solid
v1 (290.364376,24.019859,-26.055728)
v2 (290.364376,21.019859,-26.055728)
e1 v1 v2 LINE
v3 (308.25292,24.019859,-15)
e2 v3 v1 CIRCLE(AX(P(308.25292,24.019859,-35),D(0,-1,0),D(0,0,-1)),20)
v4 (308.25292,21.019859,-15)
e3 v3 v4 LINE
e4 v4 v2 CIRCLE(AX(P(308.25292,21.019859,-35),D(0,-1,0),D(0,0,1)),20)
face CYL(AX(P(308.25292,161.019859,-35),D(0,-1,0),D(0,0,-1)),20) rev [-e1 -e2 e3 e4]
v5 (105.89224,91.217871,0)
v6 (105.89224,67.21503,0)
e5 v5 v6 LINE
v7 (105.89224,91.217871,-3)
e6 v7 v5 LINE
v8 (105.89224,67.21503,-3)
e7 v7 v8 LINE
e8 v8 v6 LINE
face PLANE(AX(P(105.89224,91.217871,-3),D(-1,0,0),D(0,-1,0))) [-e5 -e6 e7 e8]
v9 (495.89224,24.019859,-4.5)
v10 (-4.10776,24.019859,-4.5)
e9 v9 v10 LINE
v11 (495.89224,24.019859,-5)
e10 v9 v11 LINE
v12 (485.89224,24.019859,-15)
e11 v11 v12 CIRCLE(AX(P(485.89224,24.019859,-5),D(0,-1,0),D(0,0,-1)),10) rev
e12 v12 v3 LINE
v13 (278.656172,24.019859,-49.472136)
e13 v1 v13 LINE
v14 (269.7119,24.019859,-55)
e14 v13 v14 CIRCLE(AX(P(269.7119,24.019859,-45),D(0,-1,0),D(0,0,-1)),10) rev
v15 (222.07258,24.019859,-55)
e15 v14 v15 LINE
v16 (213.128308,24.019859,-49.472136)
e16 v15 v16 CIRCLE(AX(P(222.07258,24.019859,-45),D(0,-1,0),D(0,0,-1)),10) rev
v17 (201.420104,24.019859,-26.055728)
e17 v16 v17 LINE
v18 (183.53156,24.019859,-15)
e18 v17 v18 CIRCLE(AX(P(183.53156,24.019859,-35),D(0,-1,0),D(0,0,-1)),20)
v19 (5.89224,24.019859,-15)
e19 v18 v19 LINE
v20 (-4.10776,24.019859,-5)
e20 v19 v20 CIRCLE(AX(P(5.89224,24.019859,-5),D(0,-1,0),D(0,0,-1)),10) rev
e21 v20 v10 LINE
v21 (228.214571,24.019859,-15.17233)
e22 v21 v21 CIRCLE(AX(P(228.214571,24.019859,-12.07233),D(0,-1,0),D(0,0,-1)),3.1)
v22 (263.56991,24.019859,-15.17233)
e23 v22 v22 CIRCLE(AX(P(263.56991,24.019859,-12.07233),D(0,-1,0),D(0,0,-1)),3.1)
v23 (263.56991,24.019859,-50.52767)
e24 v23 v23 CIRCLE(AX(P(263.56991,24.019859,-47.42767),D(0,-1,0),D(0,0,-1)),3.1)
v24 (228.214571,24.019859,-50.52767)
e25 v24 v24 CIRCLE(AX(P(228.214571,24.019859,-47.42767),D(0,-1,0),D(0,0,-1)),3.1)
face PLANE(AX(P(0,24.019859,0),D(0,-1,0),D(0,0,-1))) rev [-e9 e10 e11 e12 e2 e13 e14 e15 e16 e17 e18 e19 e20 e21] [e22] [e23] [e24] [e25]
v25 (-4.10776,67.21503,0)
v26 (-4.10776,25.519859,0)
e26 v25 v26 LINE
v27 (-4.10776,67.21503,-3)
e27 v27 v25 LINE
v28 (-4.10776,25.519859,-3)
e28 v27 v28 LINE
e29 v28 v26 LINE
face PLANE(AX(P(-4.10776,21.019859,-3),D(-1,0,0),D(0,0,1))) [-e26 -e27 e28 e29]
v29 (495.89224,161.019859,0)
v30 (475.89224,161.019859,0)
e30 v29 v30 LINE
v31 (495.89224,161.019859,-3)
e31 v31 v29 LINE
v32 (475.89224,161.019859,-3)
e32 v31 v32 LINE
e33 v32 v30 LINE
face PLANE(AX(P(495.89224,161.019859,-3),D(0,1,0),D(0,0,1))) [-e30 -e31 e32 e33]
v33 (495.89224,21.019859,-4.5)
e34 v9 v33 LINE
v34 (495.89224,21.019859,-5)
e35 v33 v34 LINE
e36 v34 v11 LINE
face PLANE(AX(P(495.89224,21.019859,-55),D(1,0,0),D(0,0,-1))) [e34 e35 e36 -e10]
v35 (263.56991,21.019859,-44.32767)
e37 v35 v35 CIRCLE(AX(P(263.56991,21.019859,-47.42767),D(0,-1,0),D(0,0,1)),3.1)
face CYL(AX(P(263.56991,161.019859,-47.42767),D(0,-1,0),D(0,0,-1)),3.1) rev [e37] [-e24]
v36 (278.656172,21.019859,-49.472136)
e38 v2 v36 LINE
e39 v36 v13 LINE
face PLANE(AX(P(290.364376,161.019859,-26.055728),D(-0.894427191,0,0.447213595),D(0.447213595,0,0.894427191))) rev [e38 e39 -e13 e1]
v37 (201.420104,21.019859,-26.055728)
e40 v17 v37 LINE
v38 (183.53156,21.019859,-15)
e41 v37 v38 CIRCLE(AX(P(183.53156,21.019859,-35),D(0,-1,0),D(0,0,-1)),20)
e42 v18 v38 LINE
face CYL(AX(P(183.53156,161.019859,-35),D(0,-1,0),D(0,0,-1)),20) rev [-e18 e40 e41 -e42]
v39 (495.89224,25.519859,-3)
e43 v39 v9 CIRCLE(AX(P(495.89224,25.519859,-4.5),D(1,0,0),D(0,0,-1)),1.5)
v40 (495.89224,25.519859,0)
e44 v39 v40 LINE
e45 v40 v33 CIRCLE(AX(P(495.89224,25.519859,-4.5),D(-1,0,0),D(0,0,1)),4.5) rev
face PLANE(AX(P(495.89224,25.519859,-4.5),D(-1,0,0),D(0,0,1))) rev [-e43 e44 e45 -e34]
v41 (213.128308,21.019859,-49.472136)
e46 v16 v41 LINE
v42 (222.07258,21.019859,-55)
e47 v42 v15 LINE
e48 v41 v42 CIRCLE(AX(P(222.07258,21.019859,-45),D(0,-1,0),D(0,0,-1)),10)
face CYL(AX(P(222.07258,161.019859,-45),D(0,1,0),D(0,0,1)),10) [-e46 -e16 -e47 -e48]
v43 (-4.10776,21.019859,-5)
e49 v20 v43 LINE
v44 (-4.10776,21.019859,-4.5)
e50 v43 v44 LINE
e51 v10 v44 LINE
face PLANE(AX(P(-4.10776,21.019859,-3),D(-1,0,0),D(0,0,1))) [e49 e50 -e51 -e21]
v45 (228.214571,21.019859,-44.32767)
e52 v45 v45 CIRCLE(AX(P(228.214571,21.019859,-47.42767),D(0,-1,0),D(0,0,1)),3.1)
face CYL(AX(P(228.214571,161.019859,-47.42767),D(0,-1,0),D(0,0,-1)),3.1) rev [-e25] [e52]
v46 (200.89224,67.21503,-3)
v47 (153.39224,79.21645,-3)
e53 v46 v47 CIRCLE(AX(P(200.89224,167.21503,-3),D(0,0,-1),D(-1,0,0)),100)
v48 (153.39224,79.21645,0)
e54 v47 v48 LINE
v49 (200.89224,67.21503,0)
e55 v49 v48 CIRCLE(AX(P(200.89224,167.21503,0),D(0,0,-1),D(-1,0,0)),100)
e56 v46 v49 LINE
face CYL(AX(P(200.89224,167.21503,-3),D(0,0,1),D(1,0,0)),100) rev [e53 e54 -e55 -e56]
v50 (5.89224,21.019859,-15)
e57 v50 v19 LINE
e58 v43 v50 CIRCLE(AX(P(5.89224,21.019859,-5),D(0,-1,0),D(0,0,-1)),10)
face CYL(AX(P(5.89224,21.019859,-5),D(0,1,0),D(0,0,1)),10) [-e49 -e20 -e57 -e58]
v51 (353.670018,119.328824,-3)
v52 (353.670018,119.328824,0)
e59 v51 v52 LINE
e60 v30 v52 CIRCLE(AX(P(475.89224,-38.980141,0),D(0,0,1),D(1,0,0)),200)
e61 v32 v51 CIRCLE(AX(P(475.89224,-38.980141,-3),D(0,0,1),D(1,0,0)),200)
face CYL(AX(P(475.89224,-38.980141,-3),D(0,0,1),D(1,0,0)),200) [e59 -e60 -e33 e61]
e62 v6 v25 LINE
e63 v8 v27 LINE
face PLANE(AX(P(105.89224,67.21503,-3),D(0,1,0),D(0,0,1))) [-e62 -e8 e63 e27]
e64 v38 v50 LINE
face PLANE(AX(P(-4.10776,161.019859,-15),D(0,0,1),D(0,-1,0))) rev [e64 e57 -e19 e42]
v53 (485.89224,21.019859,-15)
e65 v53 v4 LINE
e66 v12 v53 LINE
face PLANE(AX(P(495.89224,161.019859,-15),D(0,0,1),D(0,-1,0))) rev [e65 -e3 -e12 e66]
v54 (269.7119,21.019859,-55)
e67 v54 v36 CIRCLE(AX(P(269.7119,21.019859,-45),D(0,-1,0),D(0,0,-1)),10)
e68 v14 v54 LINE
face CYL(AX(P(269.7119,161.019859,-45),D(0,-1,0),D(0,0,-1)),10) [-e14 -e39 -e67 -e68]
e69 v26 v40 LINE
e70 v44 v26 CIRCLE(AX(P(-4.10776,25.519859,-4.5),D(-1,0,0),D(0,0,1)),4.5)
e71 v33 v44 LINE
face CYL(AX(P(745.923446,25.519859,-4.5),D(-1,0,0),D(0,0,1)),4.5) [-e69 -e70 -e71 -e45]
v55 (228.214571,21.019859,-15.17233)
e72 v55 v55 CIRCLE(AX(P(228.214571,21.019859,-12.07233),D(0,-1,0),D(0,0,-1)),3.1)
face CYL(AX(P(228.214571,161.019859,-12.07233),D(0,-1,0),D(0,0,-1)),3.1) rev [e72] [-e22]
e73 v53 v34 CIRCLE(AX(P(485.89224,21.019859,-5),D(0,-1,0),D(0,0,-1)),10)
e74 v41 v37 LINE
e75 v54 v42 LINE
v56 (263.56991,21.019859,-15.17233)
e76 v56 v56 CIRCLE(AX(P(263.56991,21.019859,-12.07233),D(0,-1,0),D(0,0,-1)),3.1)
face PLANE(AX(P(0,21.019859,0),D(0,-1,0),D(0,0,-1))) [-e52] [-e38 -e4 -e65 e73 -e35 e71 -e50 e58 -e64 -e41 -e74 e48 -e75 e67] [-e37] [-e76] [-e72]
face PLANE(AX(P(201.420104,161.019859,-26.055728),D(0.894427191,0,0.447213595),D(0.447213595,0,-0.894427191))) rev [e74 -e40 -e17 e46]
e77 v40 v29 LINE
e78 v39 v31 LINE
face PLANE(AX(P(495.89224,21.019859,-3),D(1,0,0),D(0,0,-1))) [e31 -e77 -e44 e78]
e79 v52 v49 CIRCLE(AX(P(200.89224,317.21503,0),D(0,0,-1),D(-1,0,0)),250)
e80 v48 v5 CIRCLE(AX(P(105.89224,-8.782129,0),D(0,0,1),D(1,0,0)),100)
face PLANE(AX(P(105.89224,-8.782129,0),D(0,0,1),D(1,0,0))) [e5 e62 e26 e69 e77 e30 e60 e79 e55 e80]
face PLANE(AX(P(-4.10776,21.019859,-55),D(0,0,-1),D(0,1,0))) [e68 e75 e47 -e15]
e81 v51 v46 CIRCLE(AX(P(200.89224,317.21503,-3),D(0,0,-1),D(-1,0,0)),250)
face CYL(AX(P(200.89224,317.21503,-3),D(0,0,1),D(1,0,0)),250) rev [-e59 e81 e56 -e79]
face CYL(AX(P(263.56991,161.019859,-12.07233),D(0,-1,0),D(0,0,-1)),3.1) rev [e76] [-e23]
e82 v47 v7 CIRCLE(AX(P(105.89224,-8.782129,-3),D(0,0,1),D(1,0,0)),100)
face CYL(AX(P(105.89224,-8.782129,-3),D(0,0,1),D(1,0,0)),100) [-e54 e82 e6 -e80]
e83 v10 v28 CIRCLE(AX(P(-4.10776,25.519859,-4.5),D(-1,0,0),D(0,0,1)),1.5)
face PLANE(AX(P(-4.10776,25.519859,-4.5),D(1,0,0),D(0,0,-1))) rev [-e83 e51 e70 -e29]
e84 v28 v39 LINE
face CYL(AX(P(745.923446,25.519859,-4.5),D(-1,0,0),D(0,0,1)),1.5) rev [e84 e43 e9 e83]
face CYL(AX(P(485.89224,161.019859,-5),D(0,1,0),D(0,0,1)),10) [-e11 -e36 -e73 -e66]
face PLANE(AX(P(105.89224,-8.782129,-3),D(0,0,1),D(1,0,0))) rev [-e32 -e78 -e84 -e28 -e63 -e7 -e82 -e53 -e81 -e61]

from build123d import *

# Parameters (mm, degrees)
BASIS_BLECH1_DEPTH              = 3
KANTE_LASCHE1_STRIP_W           = 15
KANTE_LASCHE1_STRIP_H           = 3
KANTE_LASCHE1_STRIP_CUT_DEPTH   = 500
KANTE_LASCHE1_DEPTH             = 500
SKIZZE19_R                      = 3.1
SCHNITT_LINEAR_AUSTRAGEN2_DEPTH = 519.20277279
SCHNITT_LINEAR_AUSTRAGEN3_DEPTH = 519.20277279
VERRUNDUNG1_R                   = 10


# Sheet-metal steps are written as plain solids
with BuildPart() as part:
    # Skizze9 → Basis-Blech1 (new body)
    with BuildSketch(Plane.XY):
        with BuildLine():
            Line((-4.107759965, 21.019858626), (495.892240035, 21.019858626))
            Line((495.892240035, 21.019858626), (495.892240035, 161.019858626))
            Line((495.892240035, 161.019858626), (475.892240035, 161.019858626))
            ThreePointArc((475.892240035, 161.019858626), (411.323644717, 150.310366837), (353.670017813, 119.328823613))
            ThreePointArc((353.670017813, 119.328823613), (281.602984183, 80.601894582), (200.892240035, 67.215029846))
            ThreePointArc((200.892240035, 67.215029846), (176.395892893, 70.261798973), (153.392240035, 79.216450312))
            ThreePointArc((153.392240035, 79.216450312), (130.388587177, 88.171101651), (105.892240035, 91.217870778))
            Line((105.892240035, 91.217870778), (105.892240035, 67.215029846))
            Line((105.892240035, 67.215029846), (-4.107759965, 67.215029846))
            Line((-4.107759965, 67.215029846), (-4.107759965, 21.019858626))
        make_face()
    extrude(amount=-BASIS_BLECH1_DEPTH)

    # Kante-Lasche1 strip (across the edge) → Kante-Lasche1 strip cut (cut)
    with BuildSketch(Plane(origin=(495.892240035, 21.019858626, -3), x_dir=(0, 1, 0), z_dir=(-1, 0, 0))):
        with Locations((-3, -1.5)):
            Rectangle(KANTE_LASCHE1_STRIP_W, KANTE_LASCHE1_STRIP_H)
    extrude(amount=KANTE_LASCHE1_STRIP_CUT_DEPTH, mode=Mode.SUBTRACT)

    # Kante-Lasche1 section (across the edge) → Kante-Lasche1 (add)
    with BuildSketch(Plane(origin=(495.892240035, 21.019858626, -3), x_dir=(0, 1, 0), z_dir=(-1, 0, 0))):
        with BuildLine():
            Line((0, 1.5), (0, 52))
            Line((0, 52), (3, 52))
            Line((3, 52), (3, 1.5))
            ThreePointArc((3, 1.5), (3.439339828, 0.439339828), (4.5, 0))
            Line((4.5, 0), (4.5, -3))
            ThreePointArc((4.5, -3), (1.318019485, -1.681980515), (0, 1.5))
        make_face()
    extrude(amount=KANTE_LASCHE1_DEPTH)

    # Skizze19 → Schnitt-Linear austragen2 (cut, through all)
    with BuildSketch(Plane.XZ.offset(-21.019858626)):
        with Locations(Location((263.569909565, -12.07233047, 0), (0, 0, 270))):
            Circle(SKIZZE19_R)
        with Locations(Location((228.214570506, -12.07233047, 0), (0, 0, 270))):
            Circle(SKIZZE19_R)
        with Locations(Location((263.569909565, -47.42766953, 0), (0, 0, 270))):
            Circle(SKIZZE19_R)
        with Locations(Location((228.214570506, -47.42766953, 0), (0, 0, 270))):
            Circle(SKIZZE19_R)
    extrude(amount=-SCHNITT_LINEAR_AUSTRAGEN2_DEPTH, mode=Mode.SUBTRACT)

    # Skizze21 → Schnitt-Linear austragen3 (cut, through all)
    with BuildSketch(Plane.XZ.offset(-21.019858626)):
        with BuildLine():
            Line((-4.107759965, -55), (-4.107759965, -15))
            Line((-4.107759965, -15), (183.53156026, -15))
            ThreePointArc((183.53156026, -15), (194.046182503, -17.986983833), (201.42010408, -26.05572809))
            Line((201.42010408, -26.05572809), (215.892240035, -55))
            Line((215.892240035, -55), (-4.107759965, -55))
        make_face()
        with BuildLine():
            Line((275.892240035, -55), (495.892240035, -55))
            Line((495.892240035, -55), (495.892240035, -15))
            Line((495.892240035, -15), (308.25291981, -15))
            ThreePointArc((308.25291981, -15), (297.738297568, -17.986983833), (290.36437599, -26.05572809))
            Line((290.36437599, -26.05572809), (275.892240035, -55))
        make_face()
    extrude(amount=-SCHNITT_LINEAR_AUSTRAGEN3_DEPTH, mode=Mode.SUBTRACT)

    # Verrundung1
    verrundung1_edges = [part.edges().sort_by_distance(p)[0] for p in [
        (275.892240035, 22.519858626, -55),
        (215.892240035, 22.519858626, -55),
        (-4.107759965, 22.519858626, -15),
        (495.892240035, 22.519858626, -15),
    ]]
    fillet(verrundung1_edges, radius=VERRUNDUNG1_R)


solid = part.part
